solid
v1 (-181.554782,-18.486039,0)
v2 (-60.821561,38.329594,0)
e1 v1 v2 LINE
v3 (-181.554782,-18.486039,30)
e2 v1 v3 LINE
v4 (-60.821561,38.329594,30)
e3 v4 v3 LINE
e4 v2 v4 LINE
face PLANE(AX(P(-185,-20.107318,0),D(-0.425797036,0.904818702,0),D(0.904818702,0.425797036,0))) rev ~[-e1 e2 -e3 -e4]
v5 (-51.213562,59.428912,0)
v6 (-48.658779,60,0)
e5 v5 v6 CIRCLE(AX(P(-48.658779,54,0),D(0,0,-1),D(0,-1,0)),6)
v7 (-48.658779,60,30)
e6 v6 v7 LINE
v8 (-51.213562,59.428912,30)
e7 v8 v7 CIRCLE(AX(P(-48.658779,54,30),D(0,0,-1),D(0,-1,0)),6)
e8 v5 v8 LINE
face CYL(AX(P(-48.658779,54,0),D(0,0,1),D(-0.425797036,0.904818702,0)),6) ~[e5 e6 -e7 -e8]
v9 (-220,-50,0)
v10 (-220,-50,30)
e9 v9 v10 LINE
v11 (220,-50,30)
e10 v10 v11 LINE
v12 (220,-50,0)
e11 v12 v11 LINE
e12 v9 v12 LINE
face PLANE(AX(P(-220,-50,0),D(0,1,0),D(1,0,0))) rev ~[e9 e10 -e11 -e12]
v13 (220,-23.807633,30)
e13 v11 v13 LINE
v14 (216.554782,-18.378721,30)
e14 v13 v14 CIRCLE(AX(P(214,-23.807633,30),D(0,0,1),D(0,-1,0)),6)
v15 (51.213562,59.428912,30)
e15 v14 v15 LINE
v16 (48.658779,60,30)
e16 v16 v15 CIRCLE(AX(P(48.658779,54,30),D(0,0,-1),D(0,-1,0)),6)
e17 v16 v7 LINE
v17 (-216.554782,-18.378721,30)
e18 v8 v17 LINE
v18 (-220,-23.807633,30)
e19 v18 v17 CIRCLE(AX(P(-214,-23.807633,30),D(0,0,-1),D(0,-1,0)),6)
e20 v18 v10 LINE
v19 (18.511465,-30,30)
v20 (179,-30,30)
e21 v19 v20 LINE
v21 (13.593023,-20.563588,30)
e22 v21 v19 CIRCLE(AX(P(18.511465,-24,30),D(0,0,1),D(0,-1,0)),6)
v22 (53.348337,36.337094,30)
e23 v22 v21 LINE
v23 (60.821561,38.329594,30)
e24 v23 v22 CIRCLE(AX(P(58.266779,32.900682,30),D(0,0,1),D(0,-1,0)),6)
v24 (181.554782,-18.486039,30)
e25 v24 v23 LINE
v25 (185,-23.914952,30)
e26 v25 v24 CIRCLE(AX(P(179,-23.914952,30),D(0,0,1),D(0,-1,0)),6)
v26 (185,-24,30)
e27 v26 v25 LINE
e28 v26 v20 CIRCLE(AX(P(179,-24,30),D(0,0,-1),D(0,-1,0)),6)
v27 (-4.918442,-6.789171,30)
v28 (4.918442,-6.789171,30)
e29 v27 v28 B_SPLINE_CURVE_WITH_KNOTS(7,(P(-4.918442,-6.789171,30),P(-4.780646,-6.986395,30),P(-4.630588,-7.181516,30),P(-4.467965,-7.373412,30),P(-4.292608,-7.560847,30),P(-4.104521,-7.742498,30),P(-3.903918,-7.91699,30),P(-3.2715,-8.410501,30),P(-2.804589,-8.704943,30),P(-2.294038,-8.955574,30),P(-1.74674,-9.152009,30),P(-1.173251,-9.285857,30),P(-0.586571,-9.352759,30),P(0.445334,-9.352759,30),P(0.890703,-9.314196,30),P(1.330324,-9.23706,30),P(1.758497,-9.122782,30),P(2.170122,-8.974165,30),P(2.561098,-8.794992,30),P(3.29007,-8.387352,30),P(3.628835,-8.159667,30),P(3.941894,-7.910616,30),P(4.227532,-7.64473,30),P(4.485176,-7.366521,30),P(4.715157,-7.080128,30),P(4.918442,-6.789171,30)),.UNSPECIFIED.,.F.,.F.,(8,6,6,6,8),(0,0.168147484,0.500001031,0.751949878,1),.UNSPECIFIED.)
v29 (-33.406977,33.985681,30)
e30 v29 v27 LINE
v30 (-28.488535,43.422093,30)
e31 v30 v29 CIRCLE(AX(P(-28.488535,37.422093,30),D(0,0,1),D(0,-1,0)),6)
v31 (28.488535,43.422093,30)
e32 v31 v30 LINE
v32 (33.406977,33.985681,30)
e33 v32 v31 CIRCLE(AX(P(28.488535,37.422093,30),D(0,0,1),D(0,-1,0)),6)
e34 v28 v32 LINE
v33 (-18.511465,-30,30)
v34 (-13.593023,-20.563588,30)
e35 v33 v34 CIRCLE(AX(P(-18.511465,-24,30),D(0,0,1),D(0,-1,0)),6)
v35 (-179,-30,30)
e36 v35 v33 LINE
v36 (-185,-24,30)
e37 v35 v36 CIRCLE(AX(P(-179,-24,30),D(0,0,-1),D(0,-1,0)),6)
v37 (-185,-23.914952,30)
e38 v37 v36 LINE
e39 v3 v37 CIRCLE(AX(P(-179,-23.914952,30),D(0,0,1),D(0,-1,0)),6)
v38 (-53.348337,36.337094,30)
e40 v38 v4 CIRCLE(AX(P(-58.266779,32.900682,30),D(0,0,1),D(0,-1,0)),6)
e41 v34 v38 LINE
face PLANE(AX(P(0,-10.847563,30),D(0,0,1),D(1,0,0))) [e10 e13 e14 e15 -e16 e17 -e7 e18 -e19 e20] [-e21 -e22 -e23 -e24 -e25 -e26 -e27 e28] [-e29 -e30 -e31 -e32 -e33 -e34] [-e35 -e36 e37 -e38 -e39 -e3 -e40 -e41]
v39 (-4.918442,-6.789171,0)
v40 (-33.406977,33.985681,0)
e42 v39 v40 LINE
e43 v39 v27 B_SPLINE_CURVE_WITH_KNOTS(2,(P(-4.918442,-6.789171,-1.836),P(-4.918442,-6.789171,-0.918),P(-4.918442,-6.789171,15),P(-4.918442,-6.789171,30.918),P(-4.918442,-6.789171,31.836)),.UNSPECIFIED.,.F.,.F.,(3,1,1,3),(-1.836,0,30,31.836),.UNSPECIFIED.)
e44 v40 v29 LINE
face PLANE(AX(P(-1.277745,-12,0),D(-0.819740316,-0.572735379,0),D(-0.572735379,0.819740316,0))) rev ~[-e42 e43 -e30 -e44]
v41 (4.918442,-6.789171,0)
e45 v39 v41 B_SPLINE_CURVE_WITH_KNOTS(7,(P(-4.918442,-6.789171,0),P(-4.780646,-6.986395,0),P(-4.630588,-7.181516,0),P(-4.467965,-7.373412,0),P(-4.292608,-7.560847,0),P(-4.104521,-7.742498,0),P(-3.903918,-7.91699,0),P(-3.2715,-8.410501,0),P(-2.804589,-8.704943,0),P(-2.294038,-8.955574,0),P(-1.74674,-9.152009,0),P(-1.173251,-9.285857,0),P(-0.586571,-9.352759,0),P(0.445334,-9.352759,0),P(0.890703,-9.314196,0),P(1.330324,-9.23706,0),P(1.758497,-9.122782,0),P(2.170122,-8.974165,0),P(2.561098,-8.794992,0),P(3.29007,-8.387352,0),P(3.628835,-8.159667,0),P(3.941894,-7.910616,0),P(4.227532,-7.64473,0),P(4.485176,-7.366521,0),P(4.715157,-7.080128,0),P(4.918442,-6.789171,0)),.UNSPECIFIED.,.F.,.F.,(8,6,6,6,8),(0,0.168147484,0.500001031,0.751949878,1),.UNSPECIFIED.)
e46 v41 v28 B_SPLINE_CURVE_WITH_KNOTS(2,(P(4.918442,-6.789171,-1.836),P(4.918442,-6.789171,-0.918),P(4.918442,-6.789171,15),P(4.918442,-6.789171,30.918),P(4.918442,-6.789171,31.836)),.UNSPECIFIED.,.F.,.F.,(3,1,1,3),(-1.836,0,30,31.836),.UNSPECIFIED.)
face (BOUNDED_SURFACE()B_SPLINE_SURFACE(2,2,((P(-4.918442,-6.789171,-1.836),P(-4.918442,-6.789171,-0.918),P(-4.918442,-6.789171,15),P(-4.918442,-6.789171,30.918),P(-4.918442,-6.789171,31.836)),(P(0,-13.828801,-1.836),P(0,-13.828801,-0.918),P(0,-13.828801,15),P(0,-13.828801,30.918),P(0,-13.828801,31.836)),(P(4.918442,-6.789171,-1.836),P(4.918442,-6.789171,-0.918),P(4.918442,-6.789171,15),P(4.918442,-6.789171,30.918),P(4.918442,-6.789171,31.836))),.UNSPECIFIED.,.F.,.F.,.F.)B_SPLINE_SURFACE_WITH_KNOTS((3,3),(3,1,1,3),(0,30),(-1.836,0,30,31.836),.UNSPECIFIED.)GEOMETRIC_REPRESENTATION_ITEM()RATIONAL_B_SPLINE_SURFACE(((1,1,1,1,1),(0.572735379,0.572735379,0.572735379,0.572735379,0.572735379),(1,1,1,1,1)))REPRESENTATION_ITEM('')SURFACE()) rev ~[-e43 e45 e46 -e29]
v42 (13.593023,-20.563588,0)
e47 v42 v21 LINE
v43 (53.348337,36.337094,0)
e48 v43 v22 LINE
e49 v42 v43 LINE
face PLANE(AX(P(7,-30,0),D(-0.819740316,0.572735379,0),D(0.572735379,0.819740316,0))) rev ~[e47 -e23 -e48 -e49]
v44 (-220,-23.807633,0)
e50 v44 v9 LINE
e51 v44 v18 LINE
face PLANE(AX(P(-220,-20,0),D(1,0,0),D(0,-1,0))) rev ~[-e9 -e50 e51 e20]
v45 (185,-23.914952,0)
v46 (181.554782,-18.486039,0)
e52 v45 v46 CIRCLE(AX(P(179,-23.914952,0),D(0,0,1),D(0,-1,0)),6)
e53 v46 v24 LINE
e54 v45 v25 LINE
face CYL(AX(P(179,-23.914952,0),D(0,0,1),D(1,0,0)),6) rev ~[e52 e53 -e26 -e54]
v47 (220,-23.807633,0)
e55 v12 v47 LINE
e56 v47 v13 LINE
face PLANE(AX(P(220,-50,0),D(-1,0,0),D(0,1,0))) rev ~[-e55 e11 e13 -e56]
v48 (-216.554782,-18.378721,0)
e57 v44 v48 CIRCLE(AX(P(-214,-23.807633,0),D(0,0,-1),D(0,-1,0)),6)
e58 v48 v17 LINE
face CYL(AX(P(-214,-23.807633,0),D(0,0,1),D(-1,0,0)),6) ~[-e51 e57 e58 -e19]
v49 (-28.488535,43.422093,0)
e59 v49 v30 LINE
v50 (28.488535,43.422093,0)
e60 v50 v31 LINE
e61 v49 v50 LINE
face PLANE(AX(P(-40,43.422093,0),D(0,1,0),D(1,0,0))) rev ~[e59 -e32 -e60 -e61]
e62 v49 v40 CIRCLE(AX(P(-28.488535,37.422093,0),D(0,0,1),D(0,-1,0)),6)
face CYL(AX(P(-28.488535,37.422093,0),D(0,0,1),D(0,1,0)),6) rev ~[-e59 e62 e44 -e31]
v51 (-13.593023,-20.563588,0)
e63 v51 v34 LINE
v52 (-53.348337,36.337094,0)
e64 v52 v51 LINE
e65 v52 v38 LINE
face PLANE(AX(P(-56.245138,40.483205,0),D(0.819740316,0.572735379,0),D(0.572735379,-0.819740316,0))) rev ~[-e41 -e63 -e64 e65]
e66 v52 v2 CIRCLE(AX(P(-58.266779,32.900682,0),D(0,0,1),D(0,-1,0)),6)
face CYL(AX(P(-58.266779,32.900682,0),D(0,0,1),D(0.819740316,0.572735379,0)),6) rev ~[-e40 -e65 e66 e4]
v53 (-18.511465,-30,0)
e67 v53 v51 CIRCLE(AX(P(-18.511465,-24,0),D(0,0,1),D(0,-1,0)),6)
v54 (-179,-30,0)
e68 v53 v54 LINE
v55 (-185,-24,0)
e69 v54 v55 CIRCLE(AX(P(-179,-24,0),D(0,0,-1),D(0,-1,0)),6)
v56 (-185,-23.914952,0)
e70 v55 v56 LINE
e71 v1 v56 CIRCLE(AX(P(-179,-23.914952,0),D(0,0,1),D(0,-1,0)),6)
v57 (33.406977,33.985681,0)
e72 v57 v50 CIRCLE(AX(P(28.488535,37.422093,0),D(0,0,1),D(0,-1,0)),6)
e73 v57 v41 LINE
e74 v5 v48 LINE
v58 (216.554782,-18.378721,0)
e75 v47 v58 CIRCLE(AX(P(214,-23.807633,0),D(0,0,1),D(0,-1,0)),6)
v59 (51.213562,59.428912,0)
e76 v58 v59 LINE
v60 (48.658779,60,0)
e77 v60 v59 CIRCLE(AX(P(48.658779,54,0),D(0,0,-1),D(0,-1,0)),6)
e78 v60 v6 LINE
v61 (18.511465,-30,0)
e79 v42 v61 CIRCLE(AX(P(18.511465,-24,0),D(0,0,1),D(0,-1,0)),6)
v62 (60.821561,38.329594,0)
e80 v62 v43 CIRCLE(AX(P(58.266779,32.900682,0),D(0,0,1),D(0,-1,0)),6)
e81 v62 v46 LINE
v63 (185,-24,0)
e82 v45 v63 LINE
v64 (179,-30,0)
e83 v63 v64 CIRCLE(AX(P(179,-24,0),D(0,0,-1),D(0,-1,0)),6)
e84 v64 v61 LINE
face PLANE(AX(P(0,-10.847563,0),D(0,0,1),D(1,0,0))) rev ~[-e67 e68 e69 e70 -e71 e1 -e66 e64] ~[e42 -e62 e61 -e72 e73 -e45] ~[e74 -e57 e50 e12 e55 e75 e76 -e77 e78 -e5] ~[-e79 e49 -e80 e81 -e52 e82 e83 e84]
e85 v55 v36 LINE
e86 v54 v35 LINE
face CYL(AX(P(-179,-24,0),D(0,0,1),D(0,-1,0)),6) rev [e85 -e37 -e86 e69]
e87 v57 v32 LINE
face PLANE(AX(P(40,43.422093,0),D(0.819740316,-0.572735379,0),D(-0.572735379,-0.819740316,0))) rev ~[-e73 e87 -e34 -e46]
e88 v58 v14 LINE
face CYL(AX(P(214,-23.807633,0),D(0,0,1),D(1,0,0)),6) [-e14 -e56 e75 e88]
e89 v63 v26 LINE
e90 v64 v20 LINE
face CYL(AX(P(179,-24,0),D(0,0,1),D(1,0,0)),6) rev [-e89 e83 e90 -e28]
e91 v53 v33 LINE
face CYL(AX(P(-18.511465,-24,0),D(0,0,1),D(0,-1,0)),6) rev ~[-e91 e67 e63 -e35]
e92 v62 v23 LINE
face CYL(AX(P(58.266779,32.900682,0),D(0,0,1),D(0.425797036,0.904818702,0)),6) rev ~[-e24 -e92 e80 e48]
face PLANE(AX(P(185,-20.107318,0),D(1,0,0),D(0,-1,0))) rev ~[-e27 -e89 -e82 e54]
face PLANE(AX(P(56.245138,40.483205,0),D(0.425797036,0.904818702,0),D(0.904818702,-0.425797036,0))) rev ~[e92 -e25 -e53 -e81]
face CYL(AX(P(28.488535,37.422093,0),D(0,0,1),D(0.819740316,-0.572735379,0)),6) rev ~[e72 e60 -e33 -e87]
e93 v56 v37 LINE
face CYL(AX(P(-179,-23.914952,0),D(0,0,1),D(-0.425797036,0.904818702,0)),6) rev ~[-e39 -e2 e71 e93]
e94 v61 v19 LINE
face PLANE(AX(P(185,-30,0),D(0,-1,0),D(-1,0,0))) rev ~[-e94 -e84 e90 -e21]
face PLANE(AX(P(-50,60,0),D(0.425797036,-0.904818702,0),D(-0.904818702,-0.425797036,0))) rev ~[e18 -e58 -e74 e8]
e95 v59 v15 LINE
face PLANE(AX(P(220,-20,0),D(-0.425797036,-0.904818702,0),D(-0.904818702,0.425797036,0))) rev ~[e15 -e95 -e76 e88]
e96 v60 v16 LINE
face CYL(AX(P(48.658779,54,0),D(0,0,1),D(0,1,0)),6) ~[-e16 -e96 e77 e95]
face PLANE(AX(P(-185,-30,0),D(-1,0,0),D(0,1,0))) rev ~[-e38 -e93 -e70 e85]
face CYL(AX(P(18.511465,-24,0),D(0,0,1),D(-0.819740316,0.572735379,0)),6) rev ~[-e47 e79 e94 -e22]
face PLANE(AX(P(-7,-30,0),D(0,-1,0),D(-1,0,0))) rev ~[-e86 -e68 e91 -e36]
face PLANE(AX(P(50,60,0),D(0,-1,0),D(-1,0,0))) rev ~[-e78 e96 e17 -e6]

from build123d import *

# Parameters (mm, degrees)
F1_DEPTH = 30
F3_DEPTH = 30.001
F4_R     = 6


with BuildPart() as f1:
    # F0 (on Top) → F1 (new body)
    with BuildSketch(Plane.XY):
        Polygon((-220, -20), (-220, -50), (220, -50), (220, -20), (50, 60), (-50, 60), align=None)
    extrude(amount=F1_DEPTH)

    # F2 (on face) → F3 (cut, through all)
    with BuildSketch(Plane(origin=(0, 0, 0), x_dir=(1, 0, 0), z_dir=(0, 0, -1))):
        Polygon((-185, 30), (-185, 20.1073184365), (-56.2451380356, -40.4832048408), (-7, 30), align=None)
        Polygon((-1.2777449276, 12), (-40, -43.4220933282), (40, -43.4220933282), (1.2777449276, 12), (0, 13.8288009955), align=None)
        Polygon((185, 30), (7, 30), (56.2451380356, -40.4832048408), (185, 20.1073184365), align=None)
    extrude(amount=-F3_DEPTH, mode=Mode.SUBTRACT)

    # F4
    f4_edges = [f1.edges().sort_by_distance(p)[0] for p in [
        (-185, -20.107318, 15),
        (-185, -30, 15),
        (185, -20.107318, 15),
        (185, -30, 15),
        (-50, 60, 15),
        (50, 60, 15),
        (220, -20, 15),
        (-220, -20, 15),
        (-7, -30, 15),
        (7, -30, 15),
        (0, -13.828801, 15),
        (-56.245138, 40.483205, 15),
        (56.245138, 40.483205, 15),
        (40, 43.422093, 15),
        (-40, 43.422093, 15),
    ]]
    fillet(f4_edges, radius=F4_R)


solid = f1.part
